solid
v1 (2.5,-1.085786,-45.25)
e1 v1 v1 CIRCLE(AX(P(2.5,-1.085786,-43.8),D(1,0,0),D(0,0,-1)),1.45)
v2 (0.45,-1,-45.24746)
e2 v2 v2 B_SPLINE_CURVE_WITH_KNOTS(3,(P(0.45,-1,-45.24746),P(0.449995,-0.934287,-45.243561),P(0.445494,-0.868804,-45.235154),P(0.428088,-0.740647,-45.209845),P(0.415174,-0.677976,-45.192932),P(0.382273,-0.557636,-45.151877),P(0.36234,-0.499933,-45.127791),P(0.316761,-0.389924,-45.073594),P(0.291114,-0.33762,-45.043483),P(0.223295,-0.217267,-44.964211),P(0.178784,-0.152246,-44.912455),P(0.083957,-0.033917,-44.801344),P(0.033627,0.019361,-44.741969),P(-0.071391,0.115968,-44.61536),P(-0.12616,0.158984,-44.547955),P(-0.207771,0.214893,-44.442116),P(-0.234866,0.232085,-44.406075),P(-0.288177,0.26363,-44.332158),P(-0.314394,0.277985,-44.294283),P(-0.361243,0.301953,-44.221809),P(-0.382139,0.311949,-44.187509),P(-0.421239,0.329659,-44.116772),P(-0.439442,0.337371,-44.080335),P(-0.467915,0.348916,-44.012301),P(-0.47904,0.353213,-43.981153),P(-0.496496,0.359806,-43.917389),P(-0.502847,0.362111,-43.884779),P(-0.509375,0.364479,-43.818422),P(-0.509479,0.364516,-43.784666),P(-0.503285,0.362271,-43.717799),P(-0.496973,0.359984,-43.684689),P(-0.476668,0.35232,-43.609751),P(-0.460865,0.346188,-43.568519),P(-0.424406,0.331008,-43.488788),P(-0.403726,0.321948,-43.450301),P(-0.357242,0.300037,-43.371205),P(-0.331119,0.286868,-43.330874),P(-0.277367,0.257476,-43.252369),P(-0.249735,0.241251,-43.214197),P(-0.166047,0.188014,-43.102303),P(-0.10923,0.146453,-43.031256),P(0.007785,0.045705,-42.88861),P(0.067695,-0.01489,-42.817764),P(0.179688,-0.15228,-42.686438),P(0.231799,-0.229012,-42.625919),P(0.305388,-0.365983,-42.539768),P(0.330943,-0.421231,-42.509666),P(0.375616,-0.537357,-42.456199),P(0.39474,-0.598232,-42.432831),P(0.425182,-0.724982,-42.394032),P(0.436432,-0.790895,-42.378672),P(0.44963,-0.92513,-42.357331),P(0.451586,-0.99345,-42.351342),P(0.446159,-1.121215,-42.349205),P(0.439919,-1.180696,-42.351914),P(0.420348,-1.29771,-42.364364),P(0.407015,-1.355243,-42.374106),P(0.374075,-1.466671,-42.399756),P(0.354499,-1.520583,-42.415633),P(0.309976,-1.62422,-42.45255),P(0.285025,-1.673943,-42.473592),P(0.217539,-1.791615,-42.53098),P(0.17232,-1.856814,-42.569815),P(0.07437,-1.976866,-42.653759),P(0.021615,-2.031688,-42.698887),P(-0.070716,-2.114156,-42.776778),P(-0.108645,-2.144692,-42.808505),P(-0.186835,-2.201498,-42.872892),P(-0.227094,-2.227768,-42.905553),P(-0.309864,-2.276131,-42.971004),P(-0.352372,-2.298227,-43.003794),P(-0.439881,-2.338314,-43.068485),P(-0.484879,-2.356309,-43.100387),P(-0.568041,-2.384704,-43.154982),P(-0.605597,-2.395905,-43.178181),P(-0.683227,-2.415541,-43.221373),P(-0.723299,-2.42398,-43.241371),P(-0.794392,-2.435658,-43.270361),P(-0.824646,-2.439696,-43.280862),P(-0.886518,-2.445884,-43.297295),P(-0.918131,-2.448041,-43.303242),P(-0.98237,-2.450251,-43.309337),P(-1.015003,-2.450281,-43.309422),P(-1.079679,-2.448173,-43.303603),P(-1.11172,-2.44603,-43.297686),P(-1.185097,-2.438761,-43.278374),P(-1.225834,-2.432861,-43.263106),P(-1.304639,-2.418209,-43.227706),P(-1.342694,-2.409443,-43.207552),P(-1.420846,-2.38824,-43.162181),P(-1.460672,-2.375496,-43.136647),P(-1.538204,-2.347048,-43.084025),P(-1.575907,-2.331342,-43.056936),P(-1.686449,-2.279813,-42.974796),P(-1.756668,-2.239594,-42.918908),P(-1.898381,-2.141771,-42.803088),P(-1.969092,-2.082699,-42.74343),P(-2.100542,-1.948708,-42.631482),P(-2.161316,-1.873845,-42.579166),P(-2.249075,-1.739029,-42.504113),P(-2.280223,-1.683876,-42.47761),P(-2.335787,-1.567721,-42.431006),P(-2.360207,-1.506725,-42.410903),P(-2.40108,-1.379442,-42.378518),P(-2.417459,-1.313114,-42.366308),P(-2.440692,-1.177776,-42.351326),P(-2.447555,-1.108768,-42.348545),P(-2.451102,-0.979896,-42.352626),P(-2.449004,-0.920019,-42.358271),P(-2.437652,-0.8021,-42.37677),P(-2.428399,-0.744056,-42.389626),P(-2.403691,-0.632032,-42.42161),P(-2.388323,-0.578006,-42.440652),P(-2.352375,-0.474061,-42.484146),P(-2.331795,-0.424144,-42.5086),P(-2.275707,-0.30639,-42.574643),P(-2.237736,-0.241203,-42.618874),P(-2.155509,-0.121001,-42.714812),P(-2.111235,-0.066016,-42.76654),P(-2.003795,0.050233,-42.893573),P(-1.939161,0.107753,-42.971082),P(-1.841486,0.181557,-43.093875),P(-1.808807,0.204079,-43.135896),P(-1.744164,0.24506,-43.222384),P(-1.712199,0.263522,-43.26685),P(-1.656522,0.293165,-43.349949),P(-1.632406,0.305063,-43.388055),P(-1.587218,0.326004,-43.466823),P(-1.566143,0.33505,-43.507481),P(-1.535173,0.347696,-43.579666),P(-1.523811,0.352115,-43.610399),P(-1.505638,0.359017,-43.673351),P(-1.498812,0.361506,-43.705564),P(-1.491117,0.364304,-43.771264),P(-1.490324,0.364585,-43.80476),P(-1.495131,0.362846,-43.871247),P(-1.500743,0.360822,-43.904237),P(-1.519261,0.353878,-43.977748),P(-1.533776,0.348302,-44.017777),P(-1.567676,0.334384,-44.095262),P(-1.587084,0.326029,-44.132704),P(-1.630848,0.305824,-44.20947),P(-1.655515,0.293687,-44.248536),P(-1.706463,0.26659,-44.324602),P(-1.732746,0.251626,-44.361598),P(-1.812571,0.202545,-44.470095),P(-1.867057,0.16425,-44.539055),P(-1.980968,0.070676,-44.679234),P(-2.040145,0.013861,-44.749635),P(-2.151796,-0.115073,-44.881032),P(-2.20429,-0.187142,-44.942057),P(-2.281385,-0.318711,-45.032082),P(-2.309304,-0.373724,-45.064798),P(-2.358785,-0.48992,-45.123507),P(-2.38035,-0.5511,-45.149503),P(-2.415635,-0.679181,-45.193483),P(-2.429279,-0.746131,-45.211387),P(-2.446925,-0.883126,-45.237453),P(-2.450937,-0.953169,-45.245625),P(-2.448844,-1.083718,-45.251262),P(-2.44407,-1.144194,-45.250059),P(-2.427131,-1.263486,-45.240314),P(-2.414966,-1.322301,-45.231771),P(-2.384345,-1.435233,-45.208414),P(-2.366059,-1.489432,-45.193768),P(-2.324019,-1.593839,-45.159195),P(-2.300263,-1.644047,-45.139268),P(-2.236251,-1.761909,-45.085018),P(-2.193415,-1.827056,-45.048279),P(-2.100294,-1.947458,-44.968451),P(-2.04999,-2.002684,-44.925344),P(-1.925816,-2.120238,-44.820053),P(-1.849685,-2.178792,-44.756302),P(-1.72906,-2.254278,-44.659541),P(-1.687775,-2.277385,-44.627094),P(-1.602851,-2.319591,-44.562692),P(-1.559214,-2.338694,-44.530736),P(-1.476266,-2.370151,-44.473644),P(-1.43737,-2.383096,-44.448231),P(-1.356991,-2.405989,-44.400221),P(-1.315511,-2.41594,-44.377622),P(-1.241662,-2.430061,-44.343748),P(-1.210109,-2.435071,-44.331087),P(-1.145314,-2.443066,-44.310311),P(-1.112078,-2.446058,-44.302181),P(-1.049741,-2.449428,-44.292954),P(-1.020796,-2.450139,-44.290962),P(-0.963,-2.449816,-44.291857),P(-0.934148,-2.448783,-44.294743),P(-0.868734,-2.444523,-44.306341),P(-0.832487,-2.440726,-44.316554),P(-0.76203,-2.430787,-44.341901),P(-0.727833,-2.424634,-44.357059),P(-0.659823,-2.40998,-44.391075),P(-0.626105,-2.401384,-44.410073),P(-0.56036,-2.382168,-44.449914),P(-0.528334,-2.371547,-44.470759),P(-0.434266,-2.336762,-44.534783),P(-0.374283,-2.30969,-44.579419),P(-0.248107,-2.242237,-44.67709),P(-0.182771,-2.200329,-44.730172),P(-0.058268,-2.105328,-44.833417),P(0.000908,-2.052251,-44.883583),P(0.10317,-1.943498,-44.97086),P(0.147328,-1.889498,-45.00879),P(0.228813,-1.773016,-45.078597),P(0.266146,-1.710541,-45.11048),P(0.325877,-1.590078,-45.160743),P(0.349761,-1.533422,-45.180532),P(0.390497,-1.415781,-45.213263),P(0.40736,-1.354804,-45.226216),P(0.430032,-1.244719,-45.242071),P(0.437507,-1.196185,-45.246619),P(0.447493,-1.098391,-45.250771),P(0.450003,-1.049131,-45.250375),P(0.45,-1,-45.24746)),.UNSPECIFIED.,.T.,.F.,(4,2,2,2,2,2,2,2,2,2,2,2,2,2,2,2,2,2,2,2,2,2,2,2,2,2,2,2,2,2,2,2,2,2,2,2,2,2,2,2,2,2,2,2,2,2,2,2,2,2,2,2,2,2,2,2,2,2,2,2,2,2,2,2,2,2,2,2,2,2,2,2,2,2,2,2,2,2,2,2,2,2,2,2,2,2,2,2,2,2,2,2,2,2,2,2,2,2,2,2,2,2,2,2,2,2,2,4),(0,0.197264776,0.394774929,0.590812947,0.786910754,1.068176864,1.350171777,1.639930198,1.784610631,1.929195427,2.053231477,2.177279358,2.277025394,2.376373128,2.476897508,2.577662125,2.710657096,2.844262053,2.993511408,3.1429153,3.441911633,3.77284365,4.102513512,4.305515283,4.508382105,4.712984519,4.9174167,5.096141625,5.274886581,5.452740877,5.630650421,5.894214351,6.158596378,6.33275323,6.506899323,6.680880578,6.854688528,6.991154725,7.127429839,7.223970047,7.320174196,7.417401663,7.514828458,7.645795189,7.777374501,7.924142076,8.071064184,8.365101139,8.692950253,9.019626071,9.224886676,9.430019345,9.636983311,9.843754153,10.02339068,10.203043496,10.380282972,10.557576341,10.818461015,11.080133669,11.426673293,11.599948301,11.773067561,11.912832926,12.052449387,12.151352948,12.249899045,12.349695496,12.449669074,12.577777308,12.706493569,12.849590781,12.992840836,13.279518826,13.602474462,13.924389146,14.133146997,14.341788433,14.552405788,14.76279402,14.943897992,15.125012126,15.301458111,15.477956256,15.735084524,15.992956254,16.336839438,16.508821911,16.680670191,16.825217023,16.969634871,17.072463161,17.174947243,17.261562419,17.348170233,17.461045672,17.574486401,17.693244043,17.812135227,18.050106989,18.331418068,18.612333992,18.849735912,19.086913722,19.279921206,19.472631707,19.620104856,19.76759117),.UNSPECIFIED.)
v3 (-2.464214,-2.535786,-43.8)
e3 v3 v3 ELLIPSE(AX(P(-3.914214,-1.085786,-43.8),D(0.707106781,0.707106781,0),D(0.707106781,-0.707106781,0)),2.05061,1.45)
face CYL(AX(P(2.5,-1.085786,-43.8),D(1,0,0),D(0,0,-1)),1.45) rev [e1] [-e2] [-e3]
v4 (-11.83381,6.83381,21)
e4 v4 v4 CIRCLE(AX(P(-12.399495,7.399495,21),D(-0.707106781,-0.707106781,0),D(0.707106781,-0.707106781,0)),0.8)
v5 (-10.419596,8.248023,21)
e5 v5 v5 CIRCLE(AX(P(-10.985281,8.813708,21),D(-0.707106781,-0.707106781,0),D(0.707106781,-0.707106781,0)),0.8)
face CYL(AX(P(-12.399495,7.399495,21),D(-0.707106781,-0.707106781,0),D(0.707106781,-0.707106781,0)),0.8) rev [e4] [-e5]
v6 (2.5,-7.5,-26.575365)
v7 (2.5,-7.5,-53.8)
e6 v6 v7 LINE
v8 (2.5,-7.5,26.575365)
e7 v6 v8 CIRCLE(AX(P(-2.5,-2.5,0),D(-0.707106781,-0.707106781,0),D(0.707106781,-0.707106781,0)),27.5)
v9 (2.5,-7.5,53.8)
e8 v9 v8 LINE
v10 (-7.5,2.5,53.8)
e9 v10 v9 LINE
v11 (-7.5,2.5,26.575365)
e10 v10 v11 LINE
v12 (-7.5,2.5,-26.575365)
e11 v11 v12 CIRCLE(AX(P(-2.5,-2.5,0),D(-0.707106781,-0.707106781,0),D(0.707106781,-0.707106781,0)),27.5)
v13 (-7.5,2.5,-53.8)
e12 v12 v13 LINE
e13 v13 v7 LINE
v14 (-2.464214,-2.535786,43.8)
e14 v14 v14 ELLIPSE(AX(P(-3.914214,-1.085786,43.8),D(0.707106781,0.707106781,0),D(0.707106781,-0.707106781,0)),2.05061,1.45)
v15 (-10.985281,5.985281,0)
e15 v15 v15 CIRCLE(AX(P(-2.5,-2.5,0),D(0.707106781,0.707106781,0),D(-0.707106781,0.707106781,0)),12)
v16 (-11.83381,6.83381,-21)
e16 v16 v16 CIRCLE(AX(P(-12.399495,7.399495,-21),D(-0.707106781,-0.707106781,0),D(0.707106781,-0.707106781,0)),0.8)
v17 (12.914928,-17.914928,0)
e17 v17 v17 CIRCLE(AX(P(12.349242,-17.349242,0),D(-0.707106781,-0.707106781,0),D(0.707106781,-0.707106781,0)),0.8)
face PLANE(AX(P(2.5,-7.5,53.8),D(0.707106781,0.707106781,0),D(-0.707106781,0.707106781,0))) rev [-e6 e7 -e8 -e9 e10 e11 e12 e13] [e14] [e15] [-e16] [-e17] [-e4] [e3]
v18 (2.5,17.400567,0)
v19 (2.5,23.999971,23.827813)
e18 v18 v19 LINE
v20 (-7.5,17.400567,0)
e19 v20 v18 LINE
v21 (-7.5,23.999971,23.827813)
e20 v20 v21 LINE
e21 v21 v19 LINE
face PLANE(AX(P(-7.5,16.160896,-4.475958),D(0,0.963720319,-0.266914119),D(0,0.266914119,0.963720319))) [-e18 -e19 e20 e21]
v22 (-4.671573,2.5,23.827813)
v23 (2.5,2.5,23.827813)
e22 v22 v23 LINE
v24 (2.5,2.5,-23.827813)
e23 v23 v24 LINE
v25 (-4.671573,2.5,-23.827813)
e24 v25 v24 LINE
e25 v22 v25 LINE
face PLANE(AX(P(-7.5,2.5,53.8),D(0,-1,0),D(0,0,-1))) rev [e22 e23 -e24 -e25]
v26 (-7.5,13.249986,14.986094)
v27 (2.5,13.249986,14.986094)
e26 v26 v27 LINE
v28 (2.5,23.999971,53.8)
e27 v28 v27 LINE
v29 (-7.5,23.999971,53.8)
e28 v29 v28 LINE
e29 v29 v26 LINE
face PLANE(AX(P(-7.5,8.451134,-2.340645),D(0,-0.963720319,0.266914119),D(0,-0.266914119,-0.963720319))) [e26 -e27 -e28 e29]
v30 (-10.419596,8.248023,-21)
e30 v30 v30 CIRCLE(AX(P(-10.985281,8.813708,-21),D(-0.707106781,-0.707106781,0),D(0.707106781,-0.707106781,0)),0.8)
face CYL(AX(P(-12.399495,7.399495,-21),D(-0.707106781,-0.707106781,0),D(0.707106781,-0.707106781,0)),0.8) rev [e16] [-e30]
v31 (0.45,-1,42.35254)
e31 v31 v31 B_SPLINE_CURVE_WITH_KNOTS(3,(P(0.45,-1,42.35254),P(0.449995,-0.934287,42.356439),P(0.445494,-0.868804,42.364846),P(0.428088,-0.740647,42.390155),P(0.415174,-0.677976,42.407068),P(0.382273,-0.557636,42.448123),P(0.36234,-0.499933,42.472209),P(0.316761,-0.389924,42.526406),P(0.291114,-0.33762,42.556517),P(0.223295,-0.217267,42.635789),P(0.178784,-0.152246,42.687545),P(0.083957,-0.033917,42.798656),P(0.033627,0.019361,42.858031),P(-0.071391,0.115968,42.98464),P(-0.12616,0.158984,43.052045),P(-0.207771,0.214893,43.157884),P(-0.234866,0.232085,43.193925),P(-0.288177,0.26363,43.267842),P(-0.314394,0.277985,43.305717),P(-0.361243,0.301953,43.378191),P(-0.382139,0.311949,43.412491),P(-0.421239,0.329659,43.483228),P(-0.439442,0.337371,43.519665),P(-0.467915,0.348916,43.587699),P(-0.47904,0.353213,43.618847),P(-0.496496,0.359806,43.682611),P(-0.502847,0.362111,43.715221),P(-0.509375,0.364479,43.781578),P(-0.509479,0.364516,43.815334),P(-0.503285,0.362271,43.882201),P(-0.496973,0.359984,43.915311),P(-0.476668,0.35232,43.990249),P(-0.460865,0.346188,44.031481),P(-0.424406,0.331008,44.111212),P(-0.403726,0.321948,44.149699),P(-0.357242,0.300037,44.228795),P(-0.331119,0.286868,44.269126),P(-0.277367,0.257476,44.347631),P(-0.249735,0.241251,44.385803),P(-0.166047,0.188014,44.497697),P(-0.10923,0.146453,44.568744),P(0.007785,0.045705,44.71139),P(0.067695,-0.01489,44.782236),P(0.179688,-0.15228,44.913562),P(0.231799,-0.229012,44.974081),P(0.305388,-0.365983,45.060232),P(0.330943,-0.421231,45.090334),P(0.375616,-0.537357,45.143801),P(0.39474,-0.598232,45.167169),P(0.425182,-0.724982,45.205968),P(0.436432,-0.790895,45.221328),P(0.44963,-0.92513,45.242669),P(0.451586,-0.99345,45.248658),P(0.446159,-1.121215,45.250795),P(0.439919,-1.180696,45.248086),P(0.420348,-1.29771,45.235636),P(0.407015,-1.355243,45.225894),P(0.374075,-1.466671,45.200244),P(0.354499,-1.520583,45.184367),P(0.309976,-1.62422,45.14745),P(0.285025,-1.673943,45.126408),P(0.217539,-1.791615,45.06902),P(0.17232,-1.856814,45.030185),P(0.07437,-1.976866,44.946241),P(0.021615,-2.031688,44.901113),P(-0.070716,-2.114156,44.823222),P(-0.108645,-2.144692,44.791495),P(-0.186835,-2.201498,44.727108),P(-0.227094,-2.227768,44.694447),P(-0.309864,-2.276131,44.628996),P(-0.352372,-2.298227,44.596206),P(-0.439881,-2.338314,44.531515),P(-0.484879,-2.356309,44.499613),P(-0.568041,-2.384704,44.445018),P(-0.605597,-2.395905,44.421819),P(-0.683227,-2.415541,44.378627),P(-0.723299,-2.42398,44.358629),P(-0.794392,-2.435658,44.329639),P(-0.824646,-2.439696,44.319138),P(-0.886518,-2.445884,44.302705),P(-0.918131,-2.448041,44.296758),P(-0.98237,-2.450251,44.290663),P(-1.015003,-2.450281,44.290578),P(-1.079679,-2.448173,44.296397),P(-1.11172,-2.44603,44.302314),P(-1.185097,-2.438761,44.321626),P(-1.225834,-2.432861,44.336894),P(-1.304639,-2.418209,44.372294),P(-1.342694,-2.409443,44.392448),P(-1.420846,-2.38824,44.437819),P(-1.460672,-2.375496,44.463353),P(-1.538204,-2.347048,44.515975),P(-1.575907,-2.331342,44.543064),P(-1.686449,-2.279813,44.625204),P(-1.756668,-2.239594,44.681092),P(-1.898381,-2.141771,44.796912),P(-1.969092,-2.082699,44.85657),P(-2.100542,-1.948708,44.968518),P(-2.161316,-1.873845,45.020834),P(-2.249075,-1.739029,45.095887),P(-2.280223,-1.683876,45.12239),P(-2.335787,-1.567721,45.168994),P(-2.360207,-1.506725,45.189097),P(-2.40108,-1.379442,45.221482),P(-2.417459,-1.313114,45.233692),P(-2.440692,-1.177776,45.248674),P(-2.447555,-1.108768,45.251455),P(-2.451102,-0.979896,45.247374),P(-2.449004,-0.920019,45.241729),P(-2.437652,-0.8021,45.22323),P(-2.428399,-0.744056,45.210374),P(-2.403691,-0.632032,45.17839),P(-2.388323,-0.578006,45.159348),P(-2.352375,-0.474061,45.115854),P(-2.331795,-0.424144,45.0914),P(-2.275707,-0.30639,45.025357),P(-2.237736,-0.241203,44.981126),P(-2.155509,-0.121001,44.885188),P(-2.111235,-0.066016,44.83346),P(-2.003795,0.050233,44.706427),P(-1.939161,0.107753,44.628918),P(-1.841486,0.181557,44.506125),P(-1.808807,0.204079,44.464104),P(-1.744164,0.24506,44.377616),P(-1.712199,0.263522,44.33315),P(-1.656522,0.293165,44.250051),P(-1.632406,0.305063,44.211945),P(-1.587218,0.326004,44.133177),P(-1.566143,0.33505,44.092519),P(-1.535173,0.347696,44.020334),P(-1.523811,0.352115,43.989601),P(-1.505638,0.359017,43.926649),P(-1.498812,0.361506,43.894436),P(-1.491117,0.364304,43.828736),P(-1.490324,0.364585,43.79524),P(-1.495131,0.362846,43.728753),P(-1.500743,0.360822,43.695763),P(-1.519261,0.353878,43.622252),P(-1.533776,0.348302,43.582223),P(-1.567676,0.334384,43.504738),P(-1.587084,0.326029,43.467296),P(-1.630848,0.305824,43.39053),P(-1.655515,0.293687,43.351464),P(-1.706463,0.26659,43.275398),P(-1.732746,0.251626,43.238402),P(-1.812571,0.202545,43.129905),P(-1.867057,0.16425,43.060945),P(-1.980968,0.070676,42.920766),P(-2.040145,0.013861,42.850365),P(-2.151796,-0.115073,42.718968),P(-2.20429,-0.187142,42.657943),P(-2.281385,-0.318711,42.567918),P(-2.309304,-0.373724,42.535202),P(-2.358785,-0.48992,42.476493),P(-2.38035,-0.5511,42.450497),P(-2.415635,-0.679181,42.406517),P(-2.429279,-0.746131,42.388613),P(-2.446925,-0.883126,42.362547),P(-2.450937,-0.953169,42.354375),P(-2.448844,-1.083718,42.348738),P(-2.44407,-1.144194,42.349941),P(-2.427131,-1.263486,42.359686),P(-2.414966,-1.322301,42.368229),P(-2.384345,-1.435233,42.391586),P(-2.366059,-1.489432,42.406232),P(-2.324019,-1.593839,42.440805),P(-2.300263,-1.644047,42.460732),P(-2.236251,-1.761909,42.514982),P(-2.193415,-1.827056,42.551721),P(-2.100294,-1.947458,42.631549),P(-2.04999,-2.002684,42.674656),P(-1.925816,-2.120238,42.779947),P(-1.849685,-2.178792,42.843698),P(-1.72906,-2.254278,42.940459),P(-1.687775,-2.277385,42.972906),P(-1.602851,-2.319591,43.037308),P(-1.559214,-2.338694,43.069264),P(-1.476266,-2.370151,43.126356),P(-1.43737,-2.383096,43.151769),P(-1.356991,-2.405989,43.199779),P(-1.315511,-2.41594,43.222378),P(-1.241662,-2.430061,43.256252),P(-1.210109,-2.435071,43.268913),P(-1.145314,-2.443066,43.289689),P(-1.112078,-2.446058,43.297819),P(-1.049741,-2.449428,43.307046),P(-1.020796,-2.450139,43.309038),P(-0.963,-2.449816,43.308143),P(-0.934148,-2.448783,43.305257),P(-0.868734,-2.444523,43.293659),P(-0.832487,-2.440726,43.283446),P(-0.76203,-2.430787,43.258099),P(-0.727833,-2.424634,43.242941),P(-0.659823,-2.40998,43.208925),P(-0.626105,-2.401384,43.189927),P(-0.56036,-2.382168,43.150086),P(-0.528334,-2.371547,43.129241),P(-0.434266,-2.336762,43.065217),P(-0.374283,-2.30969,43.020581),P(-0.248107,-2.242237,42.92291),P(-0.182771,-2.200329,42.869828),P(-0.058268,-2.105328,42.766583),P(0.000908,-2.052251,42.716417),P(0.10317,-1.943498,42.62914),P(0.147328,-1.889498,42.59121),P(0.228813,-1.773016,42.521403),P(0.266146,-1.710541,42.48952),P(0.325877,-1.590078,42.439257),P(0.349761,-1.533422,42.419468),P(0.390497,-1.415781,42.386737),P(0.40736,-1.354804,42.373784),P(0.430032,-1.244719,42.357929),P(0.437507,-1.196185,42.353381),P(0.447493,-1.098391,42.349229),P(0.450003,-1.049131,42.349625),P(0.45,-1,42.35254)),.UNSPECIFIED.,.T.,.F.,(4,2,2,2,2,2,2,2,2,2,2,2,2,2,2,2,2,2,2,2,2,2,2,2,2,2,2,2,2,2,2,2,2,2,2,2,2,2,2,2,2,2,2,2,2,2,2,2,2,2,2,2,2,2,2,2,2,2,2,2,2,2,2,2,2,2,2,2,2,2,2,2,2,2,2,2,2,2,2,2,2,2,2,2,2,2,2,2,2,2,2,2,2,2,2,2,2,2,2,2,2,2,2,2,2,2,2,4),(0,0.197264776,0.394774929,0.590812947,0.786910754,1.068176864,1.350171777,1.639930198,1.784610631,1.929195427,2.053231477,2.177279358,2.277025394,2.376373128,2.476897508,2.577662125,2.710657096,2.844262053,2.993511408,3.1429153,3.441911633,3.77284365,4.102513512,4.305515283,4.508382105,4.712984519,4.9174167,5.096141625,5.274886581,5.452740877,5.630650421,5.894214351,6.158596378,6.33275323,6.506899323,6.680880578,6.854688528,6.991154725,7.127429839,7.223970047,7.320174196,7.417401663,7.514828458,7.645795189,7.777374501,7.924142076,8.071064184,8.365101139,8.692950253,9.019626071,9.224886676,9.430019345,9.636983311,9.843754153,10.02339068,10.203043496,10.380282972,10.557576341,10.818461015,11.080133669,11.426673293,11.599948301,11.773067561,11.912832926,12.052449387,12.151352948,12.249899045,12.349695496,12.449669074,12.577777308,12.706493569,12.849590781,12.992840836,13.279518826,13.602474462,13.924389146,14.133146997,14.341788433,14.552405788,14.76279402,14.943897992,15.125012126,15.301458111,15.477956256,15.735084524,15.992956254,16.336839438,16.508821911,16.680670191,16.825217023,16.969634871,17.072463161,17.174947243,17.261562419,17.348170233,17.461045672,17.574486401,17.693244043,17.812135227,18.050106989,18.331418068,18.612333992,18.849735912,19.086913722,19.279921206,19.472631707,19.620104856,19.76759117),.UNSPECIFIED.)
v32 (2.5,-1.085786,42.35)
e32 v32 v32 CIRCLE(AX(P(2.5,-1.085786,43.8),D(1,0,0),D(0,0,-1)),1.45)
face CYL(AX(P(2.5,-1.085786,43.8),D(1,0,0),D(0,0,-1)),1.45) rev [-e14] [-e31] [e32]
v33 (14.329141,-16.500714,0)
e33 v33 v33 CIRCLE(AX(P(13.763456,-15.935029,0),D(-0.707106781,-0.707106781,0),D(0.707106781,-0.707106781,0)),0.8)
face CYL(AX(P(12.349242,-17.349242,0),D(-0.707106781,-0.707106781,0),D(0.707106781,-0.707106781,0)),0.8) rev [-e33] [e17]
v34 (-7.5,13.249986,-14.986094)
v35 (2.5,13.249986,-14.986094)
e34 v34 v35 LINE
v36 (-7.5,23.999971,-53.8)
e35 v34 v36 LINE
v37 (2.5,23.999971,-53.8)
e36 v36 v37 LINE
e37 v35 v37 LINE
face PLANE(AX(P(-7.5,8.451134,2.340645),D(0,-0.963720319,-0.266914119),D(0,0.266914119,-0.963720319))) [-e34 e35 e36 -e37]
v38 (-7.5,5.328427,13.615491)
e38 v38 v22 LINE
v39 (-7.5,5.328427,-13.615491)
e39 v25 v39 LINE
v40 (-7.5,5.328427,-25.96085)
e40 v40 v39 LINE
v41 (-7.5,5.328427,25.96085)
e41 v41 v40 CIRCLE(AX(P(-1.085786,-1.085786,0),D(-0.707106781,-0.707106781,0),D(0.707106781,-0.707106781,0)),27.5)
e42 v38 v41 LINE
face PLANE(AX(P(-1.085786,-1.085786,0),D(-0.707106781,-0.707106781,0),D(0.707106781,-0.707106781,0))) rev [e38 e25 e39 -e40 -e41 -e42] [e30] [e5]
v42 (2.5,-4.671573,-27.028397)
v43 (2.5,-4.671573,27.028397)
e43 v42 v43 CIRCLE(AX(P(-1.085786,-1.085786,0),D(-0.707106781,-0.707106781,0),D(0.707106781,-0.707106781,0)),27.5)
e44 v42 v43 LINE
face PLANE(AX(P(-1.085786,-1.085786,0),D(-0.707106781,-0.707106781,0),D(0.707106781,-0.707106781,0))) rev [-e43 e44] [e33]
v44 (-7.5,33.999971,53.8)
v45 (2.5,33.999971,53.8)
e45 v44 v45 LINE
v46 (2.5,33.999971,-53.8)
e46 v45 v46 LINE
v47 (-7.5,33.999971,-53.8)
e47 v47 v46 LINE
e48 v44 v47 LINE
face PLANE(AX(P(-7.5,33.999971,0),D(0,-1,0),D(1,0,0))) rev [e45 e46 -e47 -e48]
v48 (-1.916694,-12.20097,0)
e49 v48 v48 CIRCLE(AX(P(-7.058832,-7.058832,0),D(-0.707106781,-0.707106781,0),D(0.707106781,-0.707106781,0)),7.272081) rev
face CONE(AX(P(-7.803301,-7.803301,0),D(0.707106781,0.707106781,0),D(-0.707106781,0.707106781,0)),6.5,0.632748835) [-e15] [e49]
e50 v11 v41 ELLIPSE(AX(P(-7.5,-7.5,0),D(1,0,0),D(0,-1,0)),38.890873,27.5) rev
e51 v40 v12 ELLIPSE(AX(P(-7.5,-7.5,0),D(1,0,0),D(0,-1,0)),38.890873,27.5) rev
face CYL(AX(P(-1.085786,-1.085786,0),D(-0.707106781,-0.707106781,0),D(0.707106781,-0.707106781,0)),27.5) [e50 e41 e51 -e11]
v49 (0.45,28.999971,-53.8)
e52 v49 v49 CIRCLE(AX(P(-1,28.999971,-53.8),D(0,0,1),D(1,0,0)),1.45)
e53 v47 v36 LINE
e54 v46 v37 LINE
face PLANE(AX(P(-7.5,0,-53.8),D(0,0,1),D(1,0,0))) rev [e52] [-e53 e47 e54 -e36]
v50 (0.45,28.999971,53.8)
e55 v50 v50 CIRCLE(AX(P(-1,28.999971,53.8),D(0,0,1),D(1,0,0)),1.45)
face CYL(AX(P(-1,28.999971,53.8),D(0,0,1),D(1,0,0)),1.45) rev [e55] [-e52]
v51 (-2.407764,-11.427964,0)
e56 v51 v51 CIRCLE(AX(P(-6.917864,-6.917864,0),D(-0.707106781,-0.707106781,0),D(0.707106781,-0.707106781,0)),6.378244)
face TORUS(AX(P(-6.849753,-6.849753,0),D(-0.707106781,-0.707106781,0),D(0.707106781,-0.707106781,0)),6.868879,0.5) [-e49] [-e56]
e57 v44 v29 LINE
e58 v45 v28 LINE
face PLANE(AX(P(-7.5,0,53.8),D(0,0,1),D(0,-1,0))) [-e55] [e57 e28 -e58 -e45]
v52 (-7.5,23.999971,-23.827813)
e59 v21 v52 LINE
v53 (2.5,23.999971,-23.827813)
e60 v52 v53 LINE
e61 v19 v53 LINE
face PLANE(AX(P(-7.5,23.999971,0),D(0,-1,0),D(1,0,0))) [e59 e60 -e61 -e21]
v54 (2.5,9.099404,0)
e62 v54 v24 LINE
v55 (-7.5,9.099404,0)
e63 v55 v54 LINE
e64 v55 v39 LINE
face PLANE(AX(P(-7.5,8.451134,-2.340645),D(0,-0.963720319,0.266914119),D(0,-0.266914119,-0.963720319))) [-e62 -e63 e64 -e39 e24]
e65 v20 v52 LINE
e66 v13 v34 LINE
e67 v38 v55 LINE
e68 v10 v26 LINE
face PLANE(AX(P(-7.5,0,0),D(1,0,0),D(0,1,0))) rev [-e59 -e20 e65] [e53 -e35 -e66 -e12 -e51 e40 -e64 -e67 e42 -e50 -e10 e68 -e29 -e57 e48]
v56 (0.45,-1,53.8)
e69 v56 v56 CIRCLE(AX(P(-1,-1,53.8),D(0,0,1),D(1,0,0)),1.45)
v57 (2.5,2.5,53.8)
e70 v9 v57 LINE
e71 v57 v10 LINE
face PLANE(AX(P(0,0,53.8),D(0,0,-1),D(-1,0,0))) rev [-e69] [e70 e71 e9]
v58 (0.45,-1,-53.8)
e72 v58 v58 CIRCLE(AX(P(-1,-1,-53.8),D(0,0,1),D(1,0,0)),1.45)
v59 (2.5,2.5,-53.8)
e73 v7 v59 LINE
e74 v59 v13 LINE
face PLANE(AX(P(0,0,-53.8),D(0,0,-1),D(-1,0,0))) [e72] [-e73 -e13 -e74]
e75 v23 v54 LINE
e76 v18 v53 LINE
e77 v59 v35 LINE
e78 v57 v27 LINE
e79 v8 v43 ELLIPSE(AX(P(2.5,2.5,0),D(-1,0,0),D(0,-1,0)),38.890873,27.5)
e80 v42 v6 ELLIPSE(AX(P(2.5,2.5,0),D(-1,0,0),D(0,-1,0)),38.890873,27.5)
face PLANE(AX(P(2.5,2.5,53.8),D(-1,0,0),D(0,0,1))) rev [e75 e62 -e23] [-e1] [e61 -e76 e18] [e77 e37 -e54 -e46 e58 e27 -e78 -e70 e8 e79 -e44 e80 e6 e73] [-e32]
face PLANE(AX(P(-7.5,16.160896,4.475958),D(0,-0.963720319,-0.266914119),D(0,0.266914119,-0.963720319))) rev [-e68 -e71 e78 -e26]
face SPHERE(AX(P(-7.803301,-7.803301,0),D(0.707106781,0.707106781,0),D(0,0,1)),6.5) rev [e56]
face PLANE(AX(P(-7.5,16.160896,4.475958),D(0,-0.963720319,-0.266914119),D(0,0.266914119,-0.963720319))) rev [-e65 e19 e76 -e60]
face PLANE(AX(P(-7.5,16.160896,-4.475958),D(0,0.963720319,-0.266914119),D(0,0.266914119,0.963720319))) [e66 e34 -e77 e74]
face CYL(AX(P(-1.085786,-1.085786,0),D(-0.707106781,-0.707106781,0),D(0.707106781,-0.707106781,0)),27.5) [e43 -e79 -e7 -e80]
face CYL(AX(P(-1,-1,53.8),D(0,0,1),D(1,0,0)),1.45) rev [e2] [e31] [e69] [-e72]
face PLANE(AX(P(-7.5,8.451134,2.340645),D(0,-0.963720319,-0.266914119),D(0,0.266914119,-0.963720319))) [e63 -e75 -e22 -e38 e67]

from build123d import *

# Parameters (mm, degrees)
MAIN_BODY_DEPTH        = 53.8
SKETCH4_W              = 35
SKETCH4_H              = 10.428932188
SKETCH4_H_2            = 14.142135624
BOSS_EXTRUDE2_DEPTH    = 2
M2X0_4_TAPPED_HOLE2_D  = 1.6
SIDE_HOLES_D           = 2.9
FILLET1_R              = 0.5
BOSS_EXTRUDE4_START    = -10
BOSS_EXTRUDE4_DEPTH    = 10
M2_5_CLEARANCE_HOLE1_D = 2.9
M2_5_CLEARANCE_HOLE2_D = 2.9


# Read off the part's stored shape, not the designer's step: Boss-Extrude4
with BuildPart() as part:
    # Sketch1 → Main Body (new, symmetric)
    with BuildSketch(Plane.XY):
        Polygon((-7.5, 2.5), (2.5, 2.5), (2.5, -7.5), align=None)
    extrude(amount=MAIN_BODY_DEPTH, both=True)

    # Sketch4 → Boss-Extrude2 (add)
    with BuildSketch(Plane(origin=(-2.5, -2.5, 0), x_dir=(0, 0, 1), z_dir=(-0.7071067811865474, -0.7071067811865477, 0))):
        with Locations((0, 12.285533906)):
            Rectangle(SKETCH4_W, SKETCH4_H)
        Rectangle(SKETCH4_W, SKETCH4_H_2)
        with Locations((0, -12.285533906)):
            Rectangle(SKETCH4_W, SKETCH4_H)
        with BuildLine():
            Line((-17.5, -17.5), (-17.5, -7.071067812))
            Line((-17.5, -7.071067812), (-26.575364532, -7.071067812))
            ThreePointArc((-26.575364532, -7.071067812), (0, -27.5), (26.575364532, -7.071067812))
            Line((26.575364532, -7.071067812), (17.5, -7.071067812))
            Line((17.5, -7.071067812), (17.5, -17.5))
            Line((17.5, -17.5), (-17.5, -17.5))
        make_face()
        with BuildLine():
            Line((-17.5, -7.071067812), (-17.5, 7.071067812))
            Line((-17.5, 7.071067812), (-26.575364532, 7.071067812))
            ThreePointArc((-26.575364532, 7.071067812), (-27.5, 0), (-26.575364532, -7.071067812))
            Line((-26.575364532, -7.071067812), (-17.5, -7.071067812))
        make_face()
        with BuildLine():
            Line((-17.5, 7.071067812), (-17.5, 17.5))
            Line((-17.5, 17.5), (17.5, 17.5))
            Line((17.5, 17.5), (17.5, 7.071067812))
            Line((17.5, 7.071067812), (26.575364532, 7.071067812))
            ThreePointArc((26.575364532, 7.071067812), (0, 27.5), (-26.575364532, 7.071067812))
            Line((-26.575364532, 7.071067812), (-17.5, 7.071067812))
        make_face()
        with BuildLine():
            Line((26.575364532, 7.071067812), (17.5, 7.071067812))
            Line((17.5, 7.071067812), (17.5, -7.071067812))
            Line((17.5, -7.071067812), (26.575364532, -7.071067812))
            ThreePointArc((26.575364532, -7.071067812), (27.267861345, -3.565632859), (27.5, 0))
            ThreePointArc((27.5, 0), (27.267861345, 3.565632859), (26.575364532, 7.071067812))
        make_face()
    extrude(amount=-BOSS_EXTRUDE2_DEPTH)

    # M2x0.4 Tapped Hole2 (through all)
    with Locations(Plane(origin=(-2.5, -2.5, 0), x_dir=(-0.7071067811865477, 0.7071067811865474, 0), z_dir=(-0.7071067811865474, -0.7071067811865477, 0))):
        with Locations((-21, 0), (14, 21), (14, -21)):
            Hole(M2X0_4_TAPPED_HOLE2_D / 2)

    # Side holes (through all)
    with Locations(Plane.XY.offset(53.8)):
        with Locations((-1, -1)):
            Hole(SIDE_HOLES_D / 2)

    # Sketch8 → Revolve1 (revolve)
    with BuildSketch(Plane(origin=(0, 0, 0), x_dir=(0, 0, 1), z_dir=(0.7071067811865476, -0.7071067811865476, 0)), mode=Mode.PRIVATE) as revolve1_sk:
        with BuildLine():
            Line((0, 3.535533906), (0, 4.535533906))
            ThreePointArc((0, 4.535533906), (-4.596194078, 6.439339828), (-6.5, 11.035533906))
            Line((-6.5, 11.035533906), (-12, 3.535533906))
            Line((-12, 3.535533906), (0, 3.535533906))
        make_face()
    revolve(revolve1_sk.sketch.rotate(Axis((-2.5, -2.5, 0), (-0.7071067811865476, -0.7071067811865476, 0)), 270), axis=Axis((-2.5, -2.5, 0), (-0.7071067811865476, -0.7071067811865476, 0)))

    # Fillet1
    fillet1_edges = [part.edges().sort_by_distance(p)[0] for p in [
        (-3.207106781, -12.399494937, 0),
    ]]
    fillet(fillet1_edges, radius=FILLET1_R)

    # Boss-Extrude4 outline → Boss-Extrude4 (add)
    with BuildSketch(Plane(origin=(2.5, 0, 0), x_dir=(0, 0, -1), z_dir=(1, 0, 0)).offset(BOSS_EXTRUDE4_START)):
        Polygon((53.8, 33.99997125), (-53.8, 33.99997125), (-53.8, 23.99997125), (-14.986093738, 13.249985625), (-53.8, 2.5), (-23.827812525, 2.5), (0, 9.099403842), (23.827812525, 2.5), (53.8, 2.5), (14.986093738, 13.249985625), (53.8, 23.99997125), align=None)
        Polygon((23.827812525, 23.99997125), (0, 17.400567408), (-23.827812525, 23.99997125), align=None, mode=Mode.SUBTRACT)
    extrude(amount=BOSS_EXTRUDE4_DEPTH)

    # M2.5 Clearance Hole1 (through all)
    with Locations(Plane.XY.offset(53.8)):
        with Locations((-1, 28.99997125)):
            Hole(M2_5_CLEARANCE_HOLE1_D / 2)

    # M2.5 Clearance Hole2 (through all)
    with Locations(Plane(origin=(2.5, 0, 0), x_dir=(0, 0, -1), z_dir=(1, 0, 0))):
        with Locations((-43.8, -1.085786438), (43.8, -1.085786438)):
            Hole(M2_5_CLEARANCE_HOLE2_D / 2)


solid = part.part
